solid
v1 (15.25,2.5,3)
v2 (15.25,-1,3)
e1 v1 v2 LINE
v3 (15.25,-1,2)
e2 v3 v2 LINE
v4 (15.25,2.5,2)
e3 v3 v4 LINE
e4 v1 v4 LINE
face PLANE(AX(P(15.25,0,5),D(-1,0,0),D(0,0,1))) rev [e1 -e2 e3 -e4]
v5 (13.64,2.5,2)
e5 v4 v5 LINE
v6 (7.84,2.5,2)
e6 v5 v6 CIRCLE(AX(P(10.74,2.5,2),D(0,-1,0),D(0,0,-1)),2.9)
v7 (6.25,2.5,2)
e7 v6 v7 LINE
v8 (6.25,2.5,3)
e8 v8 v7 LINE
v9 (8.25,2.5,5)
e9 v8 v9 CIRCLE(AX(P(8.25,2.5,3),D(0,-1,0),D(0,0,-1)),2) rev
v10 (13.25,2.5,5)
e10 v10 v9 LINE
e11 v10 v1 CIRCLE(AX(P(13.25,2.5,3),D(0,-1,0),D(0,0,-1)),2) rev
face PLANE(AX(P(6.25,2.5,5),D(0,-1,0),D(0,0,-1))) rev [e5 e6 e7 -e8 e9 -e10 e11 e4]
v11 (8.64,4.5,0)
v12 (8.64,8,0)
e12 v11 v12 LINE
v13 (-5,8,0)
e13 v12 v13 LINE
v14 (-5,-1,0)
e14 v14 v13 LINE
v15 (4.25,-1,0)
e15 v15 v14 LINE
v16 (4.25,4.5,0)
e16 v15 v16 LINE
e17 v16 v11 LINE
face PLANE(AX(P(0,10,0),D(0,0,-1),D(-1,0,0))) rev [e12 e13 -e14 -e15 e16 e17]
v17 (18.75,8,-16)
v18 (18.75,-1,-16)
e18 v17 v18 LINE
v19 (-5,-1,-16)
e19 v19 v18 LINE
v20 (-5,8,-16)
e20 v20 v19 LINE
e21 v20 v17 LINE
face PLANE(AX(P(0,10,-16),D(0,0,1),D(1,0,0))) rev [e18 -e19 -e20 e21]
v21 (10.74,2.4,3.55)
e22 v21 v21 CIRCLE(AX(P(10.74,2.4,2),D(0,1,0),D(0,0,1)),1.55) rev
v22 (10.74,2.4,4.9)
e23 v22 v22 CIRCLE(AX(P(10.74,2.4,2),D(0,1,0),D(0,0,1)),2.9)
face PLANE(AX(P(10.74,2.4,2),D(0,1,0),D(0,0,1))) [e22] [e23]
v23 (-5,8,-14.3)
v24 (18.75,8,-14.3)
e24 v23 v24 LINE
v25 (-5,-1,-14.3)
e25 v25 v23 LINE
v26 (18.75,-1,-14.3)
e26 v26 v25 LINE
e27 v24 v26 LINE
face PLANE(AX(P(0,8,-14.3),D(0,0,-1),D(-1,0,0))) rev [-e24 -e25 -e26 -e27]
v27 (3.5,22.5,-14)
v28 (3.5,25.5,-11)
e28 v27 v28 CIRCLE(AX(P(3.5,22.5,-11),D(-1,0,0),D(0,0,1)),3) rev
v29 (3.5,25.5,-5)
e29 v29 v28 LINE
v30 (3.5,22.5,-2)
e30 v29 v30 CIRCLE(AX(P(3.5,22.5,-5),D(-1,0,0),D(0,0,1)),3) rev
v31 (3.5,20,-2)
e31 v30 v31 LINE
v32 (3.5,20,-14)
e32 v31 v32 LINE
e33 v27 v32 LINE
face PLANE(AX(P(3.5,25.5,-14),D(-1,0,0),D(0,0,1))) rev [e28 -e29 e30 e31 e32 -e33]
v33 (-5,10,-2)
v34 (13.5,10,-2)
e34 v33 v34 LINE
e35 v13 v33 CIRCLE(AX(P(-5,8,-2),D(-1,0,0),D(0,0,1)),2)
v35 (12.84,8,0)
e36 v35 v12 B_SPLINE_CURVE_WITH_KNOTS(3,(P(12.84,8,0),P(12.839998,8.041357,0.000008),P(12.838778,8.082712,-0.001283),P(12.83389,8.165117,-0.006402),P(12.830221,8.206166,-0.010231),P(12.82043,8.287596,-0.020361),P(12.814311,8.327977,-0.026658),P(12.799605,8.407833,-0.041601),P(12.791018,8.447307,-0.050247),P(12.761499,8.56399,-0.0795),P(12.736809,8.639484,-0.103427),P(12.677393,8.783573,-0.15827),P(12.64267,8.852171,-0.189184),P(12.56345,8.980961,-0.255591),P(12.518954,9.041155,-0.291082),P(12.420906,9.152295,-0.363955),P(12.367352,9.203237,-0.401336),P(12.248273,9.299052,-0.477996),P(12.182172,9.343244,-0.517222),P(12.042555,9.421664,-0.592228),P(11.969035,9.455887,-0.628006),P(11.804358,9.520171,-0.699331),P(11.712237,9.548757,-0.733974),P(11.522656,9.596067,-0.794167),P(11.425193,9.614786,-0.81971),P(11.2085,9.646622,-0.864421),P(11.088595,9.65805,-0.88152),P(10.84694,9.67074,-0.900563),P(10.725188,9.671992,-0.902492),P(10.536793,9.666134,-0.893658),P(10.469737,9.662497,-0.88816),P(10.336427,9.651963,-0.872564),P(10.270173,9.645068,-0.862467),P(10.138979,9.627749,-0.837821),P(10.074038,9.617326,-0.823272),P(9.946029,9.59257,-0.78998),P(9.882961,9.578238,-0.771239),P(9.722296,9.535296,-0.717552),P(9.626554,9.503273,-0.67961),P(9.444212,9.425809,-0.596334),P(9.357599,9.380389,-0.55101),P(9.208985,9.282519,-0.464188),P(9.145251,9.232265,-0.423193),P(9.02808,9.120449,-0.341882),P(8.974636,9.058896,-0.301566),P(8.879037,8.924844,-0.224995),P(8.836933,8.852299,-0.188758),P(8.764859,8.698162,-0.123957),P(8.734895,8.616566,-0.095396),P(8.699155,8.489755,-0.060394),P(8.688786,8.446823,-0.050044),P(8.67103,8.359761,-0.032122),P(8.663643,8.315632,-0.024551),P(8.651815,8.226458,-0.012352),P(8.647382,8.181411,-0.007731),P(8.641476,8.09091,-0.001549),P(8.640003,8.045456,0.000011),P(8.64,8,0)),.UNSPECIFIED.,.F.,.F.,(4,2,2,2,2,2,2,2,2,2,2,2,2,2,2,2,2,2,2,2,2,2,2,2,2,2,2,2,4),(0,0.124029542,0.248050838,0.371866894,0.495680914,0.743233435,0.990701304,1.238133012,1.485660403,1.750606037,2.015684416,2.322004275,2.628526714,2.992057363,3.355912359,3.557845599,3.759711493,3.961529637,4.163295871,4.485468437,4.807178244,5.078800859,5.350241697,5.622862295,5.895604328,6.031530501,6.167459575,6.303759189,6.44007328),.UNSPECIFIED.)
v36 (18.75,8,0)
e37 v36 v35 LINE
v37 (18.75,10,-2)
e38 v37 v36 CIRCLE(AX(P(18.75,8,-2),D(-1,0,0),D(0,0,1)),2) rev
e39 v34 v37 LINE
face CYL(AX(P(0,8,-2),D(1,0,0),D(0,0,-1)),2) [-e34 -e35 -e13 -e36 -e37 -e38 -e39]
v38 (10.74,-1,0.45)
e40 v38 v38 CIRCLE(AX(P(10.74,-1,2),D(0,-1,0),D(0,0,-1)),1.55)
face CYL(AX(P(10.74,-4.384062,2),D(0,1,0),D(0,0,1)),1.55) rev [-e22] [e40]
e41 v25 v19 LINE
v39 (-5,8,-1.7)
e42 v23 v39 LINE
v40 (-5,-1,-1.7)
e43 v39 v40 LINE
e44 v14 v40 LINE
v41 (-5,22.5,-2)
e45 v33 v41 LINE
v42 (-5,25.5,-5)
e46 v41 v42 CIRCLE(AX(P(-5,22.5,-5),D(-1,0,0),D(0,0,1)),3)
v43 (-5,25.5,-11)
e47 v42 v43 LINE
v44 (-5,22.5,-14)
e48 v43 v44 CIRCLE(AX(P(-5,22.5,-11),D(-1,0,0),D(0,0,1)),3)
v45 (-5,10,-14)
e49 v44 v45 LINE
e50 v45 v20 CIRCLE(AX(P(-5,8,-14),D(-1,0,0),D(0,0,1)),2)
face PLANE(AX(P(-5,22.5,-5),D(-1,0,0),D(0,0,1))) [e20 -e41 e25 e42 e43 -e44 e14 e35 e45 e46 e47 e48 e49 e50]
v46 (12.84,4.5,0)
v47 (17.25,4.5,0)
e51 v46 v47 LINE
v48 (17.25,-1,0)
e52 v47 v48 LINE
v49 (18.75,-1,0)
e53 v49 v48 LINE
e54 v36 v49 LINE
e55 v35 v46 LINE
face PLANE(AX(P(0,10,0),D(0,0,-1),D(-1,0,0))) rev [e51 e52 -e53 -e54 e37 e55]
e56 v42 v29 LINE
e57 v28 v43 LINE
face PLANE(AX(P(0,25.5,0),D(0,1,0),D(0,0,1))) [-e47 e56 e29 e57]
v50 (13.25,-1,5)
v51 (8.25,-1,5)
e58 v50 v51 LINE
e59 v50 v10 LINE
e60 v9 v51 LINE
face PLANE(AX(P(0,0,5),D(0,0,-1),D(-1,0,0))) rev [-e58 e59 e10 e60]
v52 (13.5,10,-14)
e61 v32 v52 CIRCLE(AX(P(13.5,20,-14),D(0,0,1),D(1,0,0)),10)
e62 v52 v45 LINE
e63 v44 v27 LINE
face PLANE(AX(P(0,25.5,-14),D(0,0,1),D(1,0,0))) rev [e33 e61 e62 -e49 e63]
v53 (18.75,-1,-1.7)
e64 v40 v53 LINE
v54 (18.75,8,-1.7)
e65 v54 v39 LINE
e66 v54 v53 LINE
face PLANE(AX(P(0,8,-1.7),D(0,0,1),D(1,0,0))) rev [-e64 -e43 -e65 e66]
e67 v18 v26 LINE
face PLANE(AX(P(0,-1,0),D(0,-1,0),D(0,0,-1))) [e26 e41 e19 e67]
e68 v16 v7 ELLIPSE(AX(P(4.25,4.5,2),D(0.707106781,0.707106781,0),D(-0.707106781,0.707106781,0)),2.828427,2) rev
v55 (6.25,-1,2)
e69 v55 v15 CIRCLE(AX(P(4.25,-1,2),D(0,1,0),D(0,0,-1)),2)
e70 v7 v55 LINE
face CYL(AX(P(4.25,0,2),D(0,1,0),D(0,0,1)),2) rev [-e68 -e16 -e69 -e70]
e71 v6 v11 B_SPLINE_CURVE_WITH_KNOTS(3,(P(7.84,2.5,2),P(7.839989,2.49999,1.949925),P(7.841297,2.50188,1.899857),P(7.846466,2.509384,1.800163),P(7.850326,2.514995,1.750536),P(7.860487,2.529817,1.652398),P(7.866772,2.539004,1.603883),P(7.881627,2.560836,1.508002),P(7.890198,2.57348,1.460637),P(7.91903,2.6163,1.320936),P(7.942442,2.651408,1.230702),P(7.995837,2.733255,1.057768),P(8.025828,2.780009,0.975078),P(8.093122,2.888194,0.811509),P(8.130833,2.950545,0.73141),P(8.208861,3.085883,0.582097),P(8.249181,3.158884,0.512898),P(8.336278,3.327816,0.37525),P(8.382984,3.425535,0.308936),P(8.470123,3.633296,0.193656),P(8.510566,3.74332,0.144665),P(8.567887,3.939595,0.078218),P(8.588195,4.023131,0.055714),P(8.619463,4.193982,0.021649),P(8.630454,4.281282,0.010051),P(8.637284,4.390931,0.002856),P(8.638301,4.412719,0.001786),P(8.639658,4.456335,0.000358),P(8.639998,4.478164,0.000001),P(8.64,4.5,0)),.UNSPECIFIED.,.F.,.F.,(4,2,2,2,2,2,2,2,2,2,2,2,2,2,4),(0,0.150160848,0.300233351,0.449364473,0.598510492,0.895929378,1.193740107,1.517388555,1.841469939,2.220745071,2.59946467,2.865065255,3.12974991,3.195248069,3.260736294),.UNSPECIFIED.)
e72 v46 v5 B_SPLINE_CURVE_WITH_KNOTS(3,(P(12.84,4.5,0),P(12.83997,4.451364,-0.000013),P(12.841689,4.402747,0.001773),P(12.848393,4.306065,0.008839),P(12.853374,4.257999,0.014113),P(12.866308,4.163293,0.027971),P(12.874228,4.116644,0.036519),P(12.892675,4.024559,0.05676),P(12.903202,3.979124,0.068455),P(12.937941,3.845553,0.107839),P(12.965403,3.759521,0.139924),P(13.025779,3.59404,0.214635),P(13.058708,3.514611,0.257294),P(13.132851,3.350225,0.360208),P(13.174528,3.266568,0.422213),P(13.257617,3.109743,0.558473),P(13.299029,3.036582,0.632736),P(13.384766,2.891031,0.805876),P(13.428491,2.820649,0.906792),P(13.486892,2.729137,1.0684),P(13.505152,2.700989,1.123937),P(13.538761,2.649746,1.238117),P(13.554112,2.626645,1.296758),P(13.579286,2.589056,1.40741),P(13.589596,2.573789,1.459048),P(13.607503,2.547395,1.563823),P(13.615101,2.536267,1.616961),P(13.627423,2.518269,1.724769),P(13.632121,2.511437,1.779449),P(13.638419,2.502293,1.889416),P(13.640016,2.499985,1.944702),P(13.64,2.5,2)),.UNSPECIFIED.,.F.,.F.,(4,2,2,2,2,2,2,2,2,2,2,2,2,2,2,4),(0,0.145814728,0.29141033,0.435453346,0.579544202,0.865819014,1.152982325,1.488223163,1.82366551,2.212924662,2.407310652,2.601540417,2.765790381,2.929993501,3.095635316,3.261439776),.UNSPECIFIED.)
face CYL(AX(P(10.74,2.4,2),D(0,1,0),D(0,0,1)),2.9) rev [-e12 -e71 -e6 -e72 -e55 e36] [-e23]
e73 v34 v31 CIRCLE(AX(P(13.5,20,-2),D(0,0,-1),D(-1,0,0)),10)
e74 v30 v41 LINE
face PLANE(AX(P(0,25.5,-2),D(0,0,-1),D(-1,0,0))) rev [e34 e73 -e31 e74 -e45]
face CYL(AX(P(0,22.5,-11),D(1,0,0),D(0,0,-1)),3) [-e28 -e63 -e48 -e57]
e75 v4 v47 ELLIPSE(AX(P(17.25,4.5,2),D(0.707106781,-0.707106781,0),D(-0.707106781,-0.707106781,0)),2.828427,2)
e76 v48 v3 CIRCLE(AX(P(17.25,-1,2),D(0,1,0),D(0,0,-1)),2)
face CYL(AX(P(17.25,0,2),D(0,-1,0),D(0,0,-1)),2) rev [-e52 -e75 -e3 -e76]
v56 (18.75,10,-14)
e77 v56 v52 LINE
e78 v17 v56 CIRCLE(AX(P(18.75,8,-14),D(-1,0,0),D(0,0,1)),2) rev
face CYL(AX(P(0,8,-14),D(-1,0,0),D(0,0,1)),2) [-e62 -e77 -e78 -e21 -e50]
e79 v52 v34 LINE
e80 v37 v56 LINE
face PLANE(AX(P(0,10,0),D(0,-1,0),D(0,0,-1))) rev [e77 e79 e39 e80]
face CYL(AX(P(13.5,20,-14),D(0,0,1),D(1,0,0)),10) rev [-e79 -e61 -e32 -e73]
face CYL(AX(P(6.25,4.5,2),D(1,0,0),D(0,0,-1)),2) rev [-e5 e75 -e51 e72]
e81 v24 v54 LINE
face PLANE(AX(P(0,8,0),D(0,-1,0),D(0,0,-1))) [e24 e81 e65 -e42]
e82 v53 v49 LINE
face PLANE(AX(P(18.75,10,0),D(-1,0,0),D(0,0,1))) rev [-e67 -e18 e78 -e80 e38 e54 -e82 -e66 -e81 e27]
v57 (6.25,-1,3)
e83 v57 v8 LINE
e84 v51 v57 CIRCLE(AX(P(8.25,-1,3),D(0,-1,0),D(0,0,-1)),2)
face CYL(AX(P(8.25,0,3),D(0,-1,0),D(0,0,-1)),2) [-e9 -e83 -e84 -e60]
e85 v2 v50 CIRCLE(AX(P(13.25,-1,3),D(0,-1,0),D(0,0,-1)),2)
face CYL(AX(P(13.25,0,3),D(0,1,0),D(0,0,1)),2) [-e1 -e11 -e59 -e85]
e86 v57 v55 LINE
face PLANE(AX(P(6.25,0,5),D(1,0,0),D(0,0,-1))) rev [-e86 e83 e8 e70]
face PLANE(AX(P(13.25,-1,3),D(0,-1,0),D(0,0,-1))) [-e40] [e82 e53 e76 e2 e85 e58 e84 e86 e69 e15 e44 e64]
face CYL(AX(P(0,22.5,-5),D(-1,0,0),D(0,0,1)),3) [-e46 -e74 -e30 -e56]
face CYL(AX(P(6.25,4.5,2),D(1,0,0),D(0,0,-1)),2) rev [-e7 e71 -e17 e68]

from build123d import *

# Parameters (mm, degrees)
SALIENTE_EXTRUIR1_DEPTH = 10
CORTAR_EXTRUIR1_DEPTH   = 8
CROQUIS3_W              = 9
CROQUIS3_H              = 2.5
SALIENTE_EXTRUIR2_DEPTH = 5
CROQUIS4_R              = 1.5499999999999994
CORTAR_EXTRUIR2_DEPTH   = 2.5
REDONDEO1_R             = 2
CROQUIS5_R              = 2.9
CORTAR_EXTRUIR3_DEPTH   = 7.6
SALIENTE_EXTRUIR3_DEPTH = 15.5
REDONDEO2_R             = 10
REDONDEO3_R             = 3
SALIENTE_EXTRUIR4_DEPTH = 5
CROQUIS8_R              = 1.5499999999999994
SALIENTE_EXTRUIR5_DEPTH = 1


with BuildPart() as part:
    # Croquis1 → Saliente-Extruir1 (new body)
    with BuildSketch(Plane(origin=(0, 0, 0), x_dir=(1, 0, 0), z_dir=(0, 1, 0))):
        Polygon((0, 0), (18.75, 0), (18.749999999999996, 16), (-3.47e-15, 16), align=None)
    extrude(amount=SALIENTE_EXTRUIR1_DEPTH)

    # Croquis2 → Cortar-Extruir1 (cut)
    with BuildSketch(Plane.XZ):
        Polygon((0, -1.7000000000000002), (18.749999999999993, -1.6999999999999997), (18.749999999999996, -14.3), (1.51e-15, -14.3), align=None)
    extrude(amount=-CORTAR_EXTRUIR1_DEPTH, mode=Mode.SUBTRACT)

    # Croquis3 → Saliente-Extruir2 (add)
    with BuildSketch(Plane.XY):
        with Locations((10.750000000000002, 1.25)):
            Rectangle(CROQUIS3_W, CROQUIS3_H)
    extrude(amount=SALIENTE_EXTRUIR2_DEPTH)

    # Croquis4 → Cortar-Extruir2 (cut)
    with BuildSketch(Plane(origin=(0, 2.5, 0), x_dir=(1, 0, 0), z_dir=(0, 1, 0))):
        with Locations(Location((10.74, -2, 0), (0, 0, 270))):
            Circle(CROQUIS4_R)
    extrude(amount=-CORTAR_EXTRUIR2_DEPTH, mode=Mode.SUBTRACT)

    # Redondeo1
    # the kernel refuses this fillet: 2 mm, written as the material it adds along each edge
    with BuildSketch(Plane(origin=(6.25, 2.5, 0), x_dir=(-1, 0, 0), z_dir=(0, -1, 0))) as redondeo1_piece_1:
        with BuildLine():
            CenterArc((REDONDEO1_R, -REDONDEO1_R), REDONDEO1_R, 90, 90)
            Line((0, -REDONDEO1_R), (0, 0))
            Line((0, 0), (REDONDEO1_R, 0))
        make_face()
    extrude(amount=2.5)
    with BuildSketch(Plane(origin=(15.25, 0, 0), x_dir=(1, 0, 0), z_dir=(0, 1, 0))) as redondeo1_piece_2:
        with BuildLine():
            CenterArc((REDONDEO1_R, -REDONDEO1_R), REDONDEO1_R, 90, 90)
            Line((0, -REDONDEO1_R), (0, 0))
            Line((0, 0), (REDONDEO1_R, 0))
        make_face()
    extrude(amount=2.5)
    with BuildSketch(Plane(origin=(15.25, 2.5, 0), x_dir=(0, 1, 0), z_dir=(-1, 0, 0))) as redondeo1_piece_3_section:
        with BuildLine():
            CenterArc((REDONDEO1_R, -REDONDEO1_R), REDONDEO1_R, 90, 90)
            Line((0, -REDONDEO1_R), (0, 0))
            Line((0, 0), (REDONDEO1_R, 0))
        make_face()
    redondeo1_piece_3 = extrude(amount=9, mode=Mode.PRIVATE)
    redondeo1_piece_3 = redondeo1_piece_3 - Plane(origin=(10.74, 2.981912580650479, 2), x_dir=(-1.8e-16, 0, 1), z_dir=(0, 1, 0)) * Cylinder(1.5499999999999994, 26, mode=Mode.PRIVATE)
    add(redondeo1_piece_3)
    with BuildSketch(Plane(origin=(6.25, 7.5, 0), x_dir=(-1, 0, 0), z_dir=(0, -1, 0))) as redondeo1_piece_4a_section:
        with BuildLine():
            CenterArc((REDONDEO1_R, -REDONDEO1_R), REDONDEO1_R, 90, 90)
            Line((0, -REDONDEO1_R), (0, 0))
            Line((0, 0), (REDONDEO1_R, 0))
        make_face()
    redondeo1_piece_4a = extrude(amount=7.5, mode=Mode.PRIVATE)
    redondeo1_piece_4a = split(redondeo1_piece_4a, bisect_by=Plane(origin=(5.797209771466349, 2.5, 0.45279022853365075), z_dir=(0, 1, 0)), keep=Keep.TOP, mode=Mode.PRIVATE)
    with BuildSketch(Plane(origin=(15.25, 2.5, 0), x_dir=(0, 1, 0), z_dir=(-1, 0, 0))) as redondeo1_piece_4b_section:
        with BuildLine():
            CenterArc((REDONDEO1_R, -REDONDEO1_R), REDONDEO1_R, 90, 90)
            Line((0, -REDONDEO1_R), (0, 0))
            Line((0, 0), (REDONDEO1_R, 0))
        make_face()
    redondeo1_piece_4b = extrude(amount=14, mode=Mode.PRIVATE)
    redondeo1_piece_4b = split(redondeo1_piece_4b, bisect_by=Plane(origin=(6.25, 2.952790228533651, 0.45279022853365075), z_dir=(-1, 0, 0)), keep=Keep.TOP, mode=Mode.PRIVATE)
    redondeo1_piece_4 = redondeo1_piece_4a & redondeo1_piece_4b
    add(redondeo1_piece_4)
    with BuildSketch(Plane(origin=(20.25, 2.5, 0), x_dir=(0, 1, 0), z_dir=(-1, 0, 0))) as redondeo1_piece_5a_section:
        with BuildLine():
            CenterArc((REDONDEO1_R, -REDONDEO1_R), REDONDEO1_R, 90, 90)
            Line((0, -REDONDEO1_R), (0, 0))
            Line((0, 0), (REDONDEO1_R, 0))
        make_face()
    redondeo1_piece_5a = extrude(amount=14, mode=Mode.PRIVATE)
    redondeo1_piece_5a = split(redondeo1_piece_5a, bisect_by=Plane(origin=(18.75, 2.952790228533651, 0.45279022853365036), z_dir=(-1, 0, 2.2e-16)), keep=Keep.TOP, mode=Mode.PRIVATE)
    redondeo1_piece_5a = split(redondeo1_piece_5a, bisect_by=Plane(origin=(15.25, 2.952790228533651, 0.45279022853365075), z_dir=(1, 0, 0)), keep=Keep.TOP, mode=Mode.PRIVATE)
    with BuildSketch(Plane(origin=(15.25, 0, 0), x_dir=(1, 0, 0), z_dir=(0, 1, 0))) as redondeo1_piece_5b_section:
        with BuildLine():
            CenterArc((REDONDEO1_R, -REDONDEO1_R), REDONDEO1_R, 90, 90)
            Line((0, -REDONDEO1_R), (0, 0))
            Line((0, 0), (REDONDEO1_R, 0))
        make_face()
    redondeo1_piece_5b = extrude(amount=7.5, mode=Mode.PRIVATE)
    redondeo1_piece_5b = split(redondeo1_piece_5b, bisect_by=Plane(origin=(15.70279022853365, 2.5, 0.45279022853364964), z_dir=(0, 1, 0)), keep=Keep.TOP, mode=Mode.PRIVATE)
    redondeo1_piece_5 = redondeo1_piece_5a & redondeo1_piece_5b
    add(redondeo1_piece_5)
    # the kernel refuses this fillet: 2 mm, written as the material it takes off along each edge
    with BuildSketch(Plane(origin=(23.749999999999996, 10, -16), x_dir=(0, -1, 0), z_dir=(-1, 0, 0))) as redondeo1_2_piece_1:
        with BuildLine():
            CenterArc((REDONDEO1_R, REDONDEO1_R), REDONDEO1_R, 180, 90)
            Line((0, REDONDEO1_R), (0, 0))
            Line((0, 0), (REDONDEO1_R, 0))
        make_face()
    extrude(amount=28.75, mode=Mode.SUBTRACT)
    with BuildSketch(Plane(origin=(6.25, 7.5, 5), x_dir=(0, 0, -1), z_dir=(0, -1, 0))) as redondeo1_2_piece_2:
        with BuildLine():
            CenterArc((REDONDEO1_R, REDONDEO1_R), REDONDEO1_R, 180, 90)
            Line((0, REDONDEO1_R), (0, 0))
            Line((0, 0), (REDONDEO1_R, 0))
        make_face()
    extrude(amount=12.5, mode=Mode.SUBTRACT)
    with BuildSketch(Plane(origin=(15.25, -5, 5), x_dir=(0, 0, -1), z_dir=(0, 1, 0))) as redondeo1_2_piece_3:
        with BuildLine():
            CenterArc((REDONDEO1_R, REDONDEO1_R), REDONDEO1_R, 180, 90)
            Line((0, REDONDEO1_R), (0, 0))
            Line((0, 0), (REDONDEO1_R, 0))
        make_face()
    extrude(amount=12.5, mode=Mode.SUBTRACT)
    with BuildSketch(Plane(origin=(-5, 10, 0), x_dir=(0, -1, 0), z_dir=(1, 0, 0))) as redondeo1_2_piece_4:
        with BuildLine():
            CenterArc((REDONDEO1_R, REDONDEO1_R), REDONDEO1_R, 180, 90)
            Line((0, REDONDEO1_R), (0, 0))
            Line((0, 0), (REDONDEO1_R, 0))
        make_face()
    extrude(amount=28.75, mode=Mode.SUBTRACT)

    # Croquis5 → Cortar-Extruir3 (cut)
    with BuildSketch(Plane(origin=(0, 10, 0), x_dir=(1, 0, 0), z_dir=(0, 1, 0))):
        with Locations(Location((10.74, -2, 0), (0, 0, 270))):
            Circle(CROQUIS5_R)
    extrude(amount=-CORTAR_EXTRUIR3_DEPTH, mode=Mode.SUBTRACT)

    # Croquis6 → Saliente-Extruir3 (add)
    with BuildSketch(Plane(origin=(0, 10, 0), x_dir=(1, 0, 0), z_dir=(0, 1, 0))):
        Polygon((-3.04e-15, 14), (3.499999999999997, 14), (3.4999999999999982, 2), (-3.04e-15, 2), align=None)
    extrude(amount=SALIENTE_EXTRUIR3_DEPTH)

    # Redondeo2
    # the kernel refuses this fillet: 10 mm, written as the material it adds along each edge
    with BuildSketch(Plane(origin=(3.499999999999997, 10, -14), x_dir=(1, 0, -1.1e-16), z_dir=(1.1e-16, 0, 1))) as redondeo2_piece_1:
        with BuildLine():
            CenterArc((REDONDEO2_R, REDONDEO2_R), REDONDEO2_R, 180, 90)
            Line((-2.22e-15, REDONDEO2_R), (0, 0))
            Line((0, 0), (REDONDEO2_R, 0))
        make_face()
    extrude(amount=12)

    # Redondeo3
    redondeo3_edges = [part.edges().sort_by_distance(p)[0] for p in [
        (1.7499999999999976, 25.5, -2),
        (1.749999999999997, 25.5, -14),
    ]]
    fillet(redondeo3_edges, radius=REDONDEO3_R)

    # Croquis7 → Saliente-Extruir4 (add)
    with BuildSketch(Plane.ZY):
        with BuildLine():
            Line((-14.3, 0), (-14.3, 8))
            Line((-14.3, 8), (-1.7000000000000002, 8))
            Line((-1.7000000000000002, 8), (-1.7000000000000002, 0))
            Line((-1.7000000000000002, 0), (0, 0))
            Line((0, 0), (0, 8))
            ThreePointArc((0, 8), (-0.5857864376269049, 9.414213562373096), (-2, 10))
            Line((-2, 10), (-2, 22.500000000000004))
            ThreePointArc((-2, 22.500000000000004), (-2.878679656440357, 24.621320343559645), (-4.999999999999999, 25.500000000000004))
            Line((-4.999999999999999, 25.500000000000004), (-11, 25.500000000000004))
            ThreePointArc((-11, 25.500000000000004), (-13.121320343559642, 24.621320343559645), (-13.999999999999998, 22.500000000000004))
            Line((-13.999999999999998, 22.500000000000004), (-14, 10))
            ThreePointArc((-14, 10), (-15.414213562373096, 9.414213562373096), (-16, 8))
            Line((-16, 8), (-16, 0))
            Line((-16, 0), (-14.3, 0))
        make_face()
    extrude(amount=SALIENTE_EXTRUIR4_DEPTH)

    # Croquis8 → Saliente-Extruir5 (add)
    # profile 1 of 2: a face of its own
    with BuildSketch(Plane.XZ):
        with BuildLine():
            Line((13.25, 5), (8.25, 5))
            ThreePointArc((8.25, 5), (6.835786437626905, 4.414213562373095), (6.25, 3.0000000000000004))
            Line((6.25, 3.0000000000000004), (6.25, 2))
            ThreePointArc((6.25, 2), (5.664213562373095, 0.5857864376269051), (4.25, 0))
            Line((4.25, 0), (-5, 1.08e-15))
            Line((-5, 1.08e-15), (-5, -1.699999999999999))
            Line((-5, -1.699999999999999), (18.749999999999993, -1.6999999999999997))
            Line((18.749999999999993, -1.6999999999999997), (18.75, 0))
            Line((18.75, 0), (17.25, 0))
            ThreePointArc((17.25, 0), (15.835786437626904, 0.5857864376269051), (15.25, 2.0000000000000004))
            Line((15.25, 2.0000000000000004), (15.25, 3))
            ThreePointArc((15.25, 3), (14.664213562373096, 4.414213562373095), (13.25, 5))
        make_face()
        with Locations(Location((10.74, 2, 0), (0, 0, 90))):
            Circle(CROQUIS8_R, mode=Mode.SUBTRACT)
    # profile 2 of 2: a face of its own
    with BuildSketch(Plane.XZ):
        Polygon((18.749999999999996, -14.3), (-5.0000000000000036, -14.299999999999999), (-5.0000000000000036, -16), (18.749999999999996, -16), align=None)
    extrude(amount=SALIENTE_EXTRUIR5_DEPTH)


solid = part.part
